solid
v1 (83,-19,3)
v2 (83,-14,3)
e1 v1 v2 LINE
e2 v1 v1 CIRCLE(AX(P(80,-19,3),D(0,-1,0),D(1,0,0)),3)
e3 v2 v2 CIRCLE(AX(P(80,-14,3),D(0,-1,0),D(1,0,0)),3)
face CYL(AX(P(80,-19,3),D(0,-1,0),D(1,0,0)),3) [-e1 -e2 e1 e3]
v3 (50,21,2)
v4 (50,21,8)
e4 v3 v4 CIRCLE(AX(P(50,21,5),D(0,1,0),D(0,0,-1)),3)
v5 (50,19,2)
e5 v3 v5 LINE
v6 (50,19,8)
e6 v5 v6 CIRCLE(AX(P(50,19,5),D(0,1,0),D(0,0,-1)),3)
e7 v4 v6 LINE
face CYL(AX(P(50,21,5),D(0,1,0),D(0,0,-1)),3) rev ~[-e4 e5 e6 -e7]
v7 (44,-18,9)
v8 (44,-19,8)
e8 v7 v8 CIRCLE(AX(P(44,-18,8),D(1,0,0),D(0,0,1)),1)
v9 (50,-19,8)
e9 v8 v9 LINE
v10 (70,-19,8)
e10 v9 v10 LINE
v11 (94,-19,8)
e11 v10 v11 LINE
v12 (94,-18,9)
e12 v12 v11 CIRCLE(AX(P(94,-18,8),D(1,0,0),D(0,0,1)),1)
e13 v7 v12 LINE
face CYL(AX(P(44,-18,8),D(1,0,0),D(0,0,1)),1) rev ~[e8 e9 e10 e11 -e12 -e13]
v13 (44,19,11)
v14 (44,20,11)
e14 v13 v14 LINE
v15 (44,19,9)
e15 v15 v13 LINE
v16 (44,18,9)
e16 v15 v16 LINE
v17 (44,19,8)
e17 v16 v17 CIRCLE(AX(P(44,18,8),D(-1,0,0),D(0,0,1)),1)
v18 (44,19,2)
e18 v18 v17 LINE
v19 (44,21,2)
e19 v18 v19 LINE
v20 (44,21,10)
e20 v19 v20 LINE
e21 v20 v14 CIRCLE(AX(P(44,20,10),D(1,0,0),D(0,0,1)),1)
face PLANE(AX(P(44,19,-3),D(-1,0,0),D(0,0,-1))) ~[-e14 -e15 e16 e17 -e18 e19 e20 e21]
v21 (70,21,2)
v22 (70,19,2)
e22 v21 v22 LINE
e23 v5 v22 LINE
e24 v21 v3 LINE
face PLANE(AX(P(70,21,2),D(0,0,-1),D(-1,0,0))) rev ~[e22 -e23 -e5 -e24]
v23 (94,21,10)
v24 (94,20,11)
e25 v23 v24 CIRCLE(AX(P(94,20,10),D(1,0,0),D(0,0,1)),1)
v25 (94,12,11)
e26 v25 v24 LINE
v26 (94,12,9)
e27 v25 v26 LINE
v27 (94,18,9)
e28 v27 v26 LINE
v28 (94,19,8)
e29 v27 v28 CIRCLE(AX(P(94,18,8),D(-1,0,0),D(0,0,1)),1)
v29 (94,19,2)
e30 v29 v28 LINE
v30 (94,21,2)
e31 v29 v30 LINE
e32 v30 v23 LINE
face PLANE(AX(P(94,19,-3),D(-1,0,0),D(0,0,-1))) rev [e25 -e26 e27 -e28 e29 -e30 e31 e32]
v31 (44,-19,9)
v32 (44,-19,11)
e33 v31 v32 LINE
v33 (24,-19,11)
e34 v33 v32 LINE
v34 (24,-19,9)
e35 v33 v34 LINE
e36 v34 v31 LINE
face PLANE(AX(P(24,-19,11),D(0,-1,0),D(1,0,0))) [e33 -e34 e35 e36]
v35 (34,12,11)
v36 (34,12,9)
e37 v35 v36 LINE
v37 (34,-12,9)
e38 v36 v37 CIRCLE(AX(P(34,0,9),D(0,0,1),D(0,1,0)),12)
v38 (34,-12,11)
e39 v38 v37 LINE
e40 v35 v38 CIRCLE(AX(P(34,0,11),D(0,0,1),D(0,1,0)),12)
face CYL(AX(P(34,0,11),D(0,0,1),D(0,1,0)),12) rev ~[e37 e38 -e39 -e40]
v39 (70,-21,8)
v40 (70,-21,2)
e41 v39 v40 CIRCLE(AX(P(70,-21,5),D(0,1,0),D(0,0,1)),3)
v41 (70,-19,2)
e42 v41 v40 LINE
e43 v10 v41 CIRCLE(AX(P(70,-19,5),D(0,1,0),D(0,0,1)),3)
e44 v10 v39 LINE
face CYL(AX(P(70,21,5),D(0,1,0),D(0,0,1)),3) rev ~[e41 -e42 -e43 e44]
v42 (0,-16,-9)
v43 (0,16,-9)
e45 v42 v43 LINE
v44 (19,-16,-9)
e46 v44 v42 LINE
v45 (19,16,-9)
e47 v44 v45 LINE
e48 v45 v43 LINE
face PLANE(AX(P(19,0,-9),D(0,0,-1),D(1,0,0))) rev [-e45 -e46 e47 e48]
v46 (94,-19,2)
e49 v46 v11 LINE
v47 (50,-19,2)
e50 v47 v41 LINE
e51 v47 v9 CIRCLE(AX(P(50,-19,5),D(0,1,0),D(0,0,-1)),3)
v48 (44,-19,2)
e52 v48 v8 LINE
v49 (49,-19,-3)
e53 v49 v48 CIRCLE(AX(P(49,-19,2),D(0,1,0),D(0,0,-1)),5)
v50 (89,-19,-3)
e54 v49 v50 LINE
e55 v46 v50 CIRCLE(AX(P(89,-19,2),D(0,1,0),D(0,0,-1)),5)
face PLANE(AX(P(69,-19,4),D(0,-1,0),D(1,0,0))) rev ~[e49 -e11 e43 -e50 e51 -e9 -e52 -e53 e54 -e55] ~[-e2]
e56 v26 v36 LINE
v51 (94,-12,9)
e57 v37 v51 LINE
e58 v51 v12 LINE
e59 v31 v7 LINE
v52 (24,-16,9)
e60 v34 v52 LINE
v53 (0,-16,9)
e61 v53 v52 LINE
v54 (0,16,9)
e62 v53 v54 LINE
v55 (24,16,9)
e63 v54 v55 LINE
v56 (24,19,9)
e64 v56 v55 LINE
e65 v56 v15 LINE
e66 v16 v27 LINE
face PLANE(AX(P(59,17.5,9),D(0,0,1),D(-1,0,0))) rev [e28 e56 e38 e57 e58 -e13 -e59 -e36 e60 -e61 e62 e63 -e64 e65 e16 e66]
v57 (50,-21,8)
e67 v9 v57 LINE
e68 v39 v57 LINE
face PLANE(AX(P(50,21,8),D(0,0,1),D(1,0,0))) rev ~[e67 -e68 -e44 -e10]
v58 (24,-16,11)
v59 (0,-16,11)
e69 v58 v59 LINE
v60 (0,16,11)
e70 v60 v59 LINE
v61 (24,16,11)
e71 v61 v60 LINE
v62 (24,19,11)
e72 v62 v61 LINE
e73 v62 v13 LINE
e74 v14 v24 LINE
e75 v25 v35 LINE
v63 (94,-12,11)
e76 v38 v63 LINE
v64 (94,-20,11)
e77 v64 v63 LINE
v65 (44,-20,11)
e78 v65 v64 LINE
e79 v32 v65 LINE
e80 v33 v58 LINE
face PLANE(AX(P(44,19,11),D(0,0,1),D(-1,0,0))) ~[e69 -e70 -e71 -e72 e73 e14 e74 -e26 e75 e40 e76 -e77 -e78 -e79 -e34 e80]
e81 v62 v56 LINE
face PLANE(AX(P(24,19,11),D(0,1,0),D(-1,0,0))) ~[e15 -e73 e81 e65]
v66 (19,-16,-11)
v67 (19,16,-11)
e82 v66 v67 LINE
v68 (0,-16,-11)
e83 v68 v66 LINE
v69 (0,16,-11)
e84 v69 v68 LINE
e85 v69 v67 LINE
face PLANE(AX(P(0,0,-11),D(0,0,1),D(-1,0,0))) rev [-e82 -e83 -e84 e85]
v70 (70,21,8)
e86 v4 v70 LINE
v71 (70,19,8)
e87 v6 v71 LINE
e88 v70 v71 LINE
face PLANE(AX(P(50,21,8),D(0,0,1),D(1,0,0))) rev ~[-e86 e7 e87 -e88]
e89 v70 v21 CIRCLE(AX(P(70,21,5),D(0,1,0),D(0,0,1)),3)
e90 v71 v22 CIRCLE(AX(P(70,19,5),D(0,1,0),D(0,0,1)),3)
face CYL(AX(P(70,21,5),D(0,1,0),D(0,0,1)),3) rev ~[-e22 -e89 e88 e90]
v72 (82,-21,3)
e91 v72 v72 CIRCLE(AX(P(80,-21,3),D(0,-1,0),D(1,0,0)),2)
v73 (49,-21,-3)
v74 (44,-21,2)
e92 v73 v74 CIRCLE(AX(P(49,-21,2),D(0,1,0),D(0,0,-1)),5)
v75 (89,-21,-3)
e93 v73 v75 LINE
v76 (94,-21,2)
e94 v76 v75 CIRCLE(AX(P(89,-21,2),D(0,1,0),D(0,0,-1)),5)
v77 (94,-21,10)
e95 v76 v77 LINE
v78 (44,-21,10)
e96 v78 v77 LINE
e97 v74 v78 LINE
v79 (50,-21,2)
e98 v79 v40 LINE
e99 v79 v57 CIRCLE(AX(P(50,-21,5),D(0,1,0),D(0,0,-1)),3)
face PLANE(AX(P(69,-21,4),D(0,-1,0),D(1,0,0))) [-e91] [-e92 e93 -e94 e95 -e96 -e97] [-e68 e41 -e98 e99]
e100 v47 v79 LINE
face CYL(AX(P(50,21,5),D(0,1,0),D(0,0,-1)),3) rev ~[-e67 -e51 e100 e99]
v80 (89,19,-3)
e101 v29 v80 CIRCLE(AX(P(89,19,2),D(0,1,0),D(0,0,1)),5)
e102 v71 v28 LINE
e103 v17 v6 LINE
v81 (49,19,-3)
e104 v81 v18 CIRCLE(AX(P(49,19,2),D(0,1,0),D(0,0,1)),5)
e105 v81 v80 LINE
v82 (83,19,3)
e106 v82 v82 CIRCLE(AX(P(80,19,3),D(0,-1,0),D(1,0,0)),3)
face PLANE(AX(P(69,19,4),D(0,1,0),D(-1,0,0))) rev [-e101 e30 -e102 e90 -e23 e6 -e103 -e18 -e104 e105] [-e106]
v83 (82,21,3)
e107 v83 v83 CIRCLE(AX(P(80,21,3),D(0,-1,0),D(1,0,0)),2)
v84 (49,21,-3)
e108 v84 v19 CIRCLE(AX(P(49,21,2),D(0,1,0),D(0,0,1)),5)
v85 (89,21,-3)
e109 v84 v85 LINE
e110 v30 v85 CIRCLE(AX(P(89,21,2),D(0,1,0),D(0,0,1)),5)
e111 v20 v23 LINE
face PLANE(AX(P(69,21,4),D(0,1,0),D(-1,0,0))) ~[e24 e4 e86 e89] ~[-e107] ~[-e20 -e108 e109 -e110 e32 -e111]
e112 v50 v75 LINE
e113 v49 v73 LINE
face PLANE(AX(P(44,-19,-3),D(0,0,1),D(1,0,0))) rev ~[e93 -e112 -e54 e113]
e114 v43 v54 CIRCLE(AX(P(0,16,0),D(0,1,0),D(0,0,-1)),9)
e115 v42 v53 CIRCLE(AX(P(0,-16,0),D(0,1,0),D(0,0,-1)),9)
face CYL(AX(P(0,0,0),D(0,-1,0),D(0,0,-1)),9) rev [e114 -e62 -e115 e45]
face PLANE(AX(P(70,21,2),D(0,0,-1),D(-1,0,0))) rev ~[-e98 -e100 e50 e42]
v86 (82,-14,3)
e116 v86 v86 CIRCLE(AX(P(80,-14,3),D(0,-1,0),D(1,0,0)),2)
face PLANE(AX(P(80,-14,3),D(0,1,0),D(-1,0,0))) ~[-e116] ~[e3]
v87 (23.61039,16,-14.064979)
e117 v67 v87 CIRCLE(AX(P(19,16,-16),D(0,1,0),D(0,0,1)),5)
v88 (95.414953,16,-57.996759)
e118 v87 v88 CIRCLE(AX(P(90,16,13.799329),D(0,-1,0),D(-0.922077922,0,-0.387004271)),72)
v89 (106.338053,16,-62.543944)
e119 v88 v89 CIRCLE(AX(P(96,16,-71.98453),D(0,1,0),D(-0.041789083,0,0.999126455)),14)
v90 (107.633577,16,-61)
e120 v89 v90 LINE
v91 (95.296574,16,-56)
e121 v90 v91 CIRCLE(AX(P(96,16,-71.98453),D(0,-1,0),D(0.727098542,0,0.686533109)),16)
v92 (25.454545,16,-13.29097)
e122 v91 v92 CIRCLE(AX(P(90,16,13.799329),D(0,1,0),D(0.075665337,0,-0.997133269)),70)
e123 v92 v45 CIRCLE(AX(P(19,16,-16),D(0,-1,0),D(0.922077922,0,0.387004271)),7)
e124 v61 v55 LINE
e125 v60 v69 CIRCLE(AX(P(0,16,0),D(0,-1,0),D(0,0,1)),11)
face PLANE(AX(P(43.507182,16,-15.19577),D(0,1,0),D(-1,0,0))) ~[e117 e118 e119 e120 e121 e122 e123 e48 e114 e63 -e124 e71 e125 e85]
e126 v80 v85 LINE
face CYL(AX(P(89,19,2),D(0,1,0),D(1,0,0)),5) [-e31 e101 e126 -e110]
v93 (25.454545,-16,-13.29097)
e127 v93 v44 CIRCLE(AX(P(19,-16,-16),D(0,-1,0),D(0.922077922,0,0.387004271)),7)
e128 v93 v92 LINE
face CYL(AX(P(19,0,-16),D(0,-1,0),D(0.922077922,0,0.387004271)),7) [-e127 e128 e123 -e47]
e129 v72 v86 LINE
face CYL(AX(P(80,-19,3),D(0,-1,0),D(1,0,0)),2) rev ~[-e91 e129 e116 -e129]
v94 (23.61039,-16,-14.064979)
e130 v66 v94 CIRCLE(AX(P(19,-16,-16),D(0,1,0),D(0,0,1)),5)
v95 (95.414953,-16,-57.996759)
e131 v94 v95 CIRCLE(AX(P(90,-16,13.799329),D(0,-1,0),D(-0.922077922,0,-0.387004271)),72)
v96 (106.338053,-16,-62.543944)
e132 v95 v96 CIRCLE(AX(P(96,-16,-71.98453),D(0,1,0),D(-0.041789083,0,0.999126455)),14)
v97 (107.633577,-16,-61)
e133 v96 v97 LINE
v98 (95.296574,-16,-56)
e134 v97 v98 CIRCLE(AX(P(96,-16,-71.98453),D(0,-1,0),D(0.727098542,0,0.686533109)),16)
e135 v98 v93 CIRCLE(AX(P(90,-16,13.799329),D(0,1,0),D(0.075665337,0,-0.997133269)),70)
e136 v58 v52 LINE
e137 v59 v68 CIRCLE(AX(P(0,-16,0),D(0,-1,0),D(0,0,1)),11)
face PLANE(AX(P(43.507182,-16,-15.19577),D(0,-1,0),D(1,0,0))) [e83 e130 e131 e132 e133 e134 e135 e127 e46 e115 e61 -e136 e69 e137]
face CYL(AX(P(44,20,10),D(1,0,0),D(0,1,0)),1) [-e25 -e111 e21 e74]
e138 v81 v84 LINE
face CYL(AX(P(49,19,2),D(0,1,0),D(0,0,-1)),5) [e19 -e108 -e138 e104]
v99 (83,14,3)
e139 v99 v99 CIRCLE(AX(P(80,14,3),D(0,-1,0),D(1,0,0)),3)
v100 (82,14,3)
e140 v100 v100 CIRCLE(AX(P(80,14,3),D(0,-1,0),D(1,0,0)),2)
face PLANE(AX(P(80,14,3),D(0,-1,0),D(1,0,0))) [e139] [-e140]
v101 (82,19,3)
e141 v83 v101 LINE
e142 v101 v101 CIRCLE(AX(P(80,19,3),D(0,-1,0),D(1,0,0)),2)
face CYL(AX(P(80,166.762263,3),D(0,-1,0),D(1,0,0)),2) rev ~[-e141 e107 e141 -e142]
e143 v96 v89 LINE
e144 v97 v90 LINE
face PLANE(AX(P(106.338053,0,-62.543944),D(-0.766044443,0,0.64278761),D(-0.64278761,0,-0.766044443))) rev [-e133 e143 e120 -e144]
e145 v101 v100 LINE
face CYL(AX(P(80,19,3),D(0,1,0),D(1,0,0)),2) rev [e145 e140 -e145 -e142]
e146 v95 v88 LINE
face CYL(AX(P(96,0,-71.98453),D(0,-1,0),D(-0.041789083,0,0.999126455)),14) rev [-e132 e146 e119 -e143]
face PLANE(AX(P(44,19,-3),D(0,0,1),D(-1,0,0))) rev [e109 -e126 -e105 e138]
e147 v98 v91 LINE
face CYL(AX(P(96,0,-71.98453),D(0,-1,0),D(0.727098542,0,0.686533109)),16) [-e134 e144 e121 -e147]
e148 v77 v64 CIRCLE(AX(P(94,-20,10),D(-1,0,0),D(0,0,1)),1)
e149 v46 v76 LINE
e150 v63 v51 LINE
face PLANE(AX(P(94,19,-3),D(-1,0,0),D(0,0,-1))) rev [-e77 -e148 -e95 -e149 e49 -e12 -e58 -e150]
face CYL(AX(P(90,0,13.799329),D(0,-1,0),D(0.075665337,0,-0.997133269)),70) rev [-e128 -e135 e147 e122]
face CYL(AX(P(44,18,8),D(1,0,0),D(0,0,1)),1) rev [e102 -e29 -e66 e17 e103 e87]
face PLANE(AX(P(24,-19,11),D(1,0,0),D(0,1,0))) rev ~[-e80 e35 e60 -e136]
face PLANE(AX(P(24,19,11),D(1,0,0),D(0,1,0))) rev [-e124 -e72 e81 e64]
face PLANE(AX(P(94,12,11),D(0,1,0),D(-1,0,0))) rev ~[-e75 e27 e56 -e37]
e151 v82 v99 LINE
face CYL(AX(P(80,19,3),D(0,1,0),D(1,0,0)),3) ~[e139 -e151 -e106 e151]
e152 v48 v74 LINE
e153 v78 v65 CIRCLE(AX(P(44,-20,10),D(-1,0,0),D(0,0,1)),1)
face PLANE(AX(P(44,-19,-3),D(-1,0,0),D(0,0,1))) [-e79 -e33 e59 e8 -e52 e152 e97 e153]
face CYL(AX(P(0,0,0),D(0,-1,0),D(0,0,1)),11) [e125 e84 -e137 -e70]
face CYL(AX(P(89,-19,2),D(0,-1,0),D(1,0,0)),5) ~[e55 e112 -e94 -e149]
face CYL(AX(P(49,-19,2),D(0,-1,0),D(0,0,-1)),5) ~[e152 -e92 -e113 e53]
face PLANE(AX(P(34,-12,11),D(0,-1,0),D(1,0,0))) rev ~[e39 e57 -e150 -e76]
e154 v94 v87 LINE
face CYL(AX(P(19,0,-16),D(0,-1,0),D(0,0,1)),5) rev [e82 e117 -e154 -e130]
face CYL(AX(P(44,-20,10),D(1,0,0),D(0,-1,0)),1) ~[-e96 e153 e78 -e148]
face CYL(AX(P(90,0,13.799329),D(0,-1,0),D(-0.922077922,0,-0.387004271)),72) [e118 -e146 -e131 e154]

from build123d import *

# Parameters (mm, degrees)
F1_DEPTH  = 16
F2_W      = 70
F2_H      = 3
F3_DEPTH  = 2
F4_W      = 50
F4_H      = 14
F5_DEPTH  = 2
F6_R      = 1
F9_DEPTH  = 2
F11_DEPTH = 42.001
F13_D     = 4
F14_R     = 3
F14_R_2   = 2
F15_DEPTH = 5
F17_R     = 5


with BuildPart() as f1:
    # F0 (on Front) → F1 (new body)
    with BuildSketch(Plane.XZ):
        with BuildLine():
            Line((94, 11), (0, 11))
            ThreePointArc((0, 11), (-11, 0), (0, -11))
            Line((0, -11), (19, -11))
            ThreePointArc((19, -11), (21.7681124643, -11.8361612201), (23.6103896104, -14.064978646))
            ThreePointArc((23.6103896104, -14.064978646), (52.4237101957, -47.6174640031), (95.4149528414, -57.9967593826))
            ThreePointArc((95.4149528414, -57.9967593826), (101.3804745105, -59.0597282402), (106.3380534538, -62.5439444501))
            Line((106.3380534538, -62.5439444501), (107.6335766724, -61))
            ThreePointArc((107.6335766724, -61), (102.0097459375, -57.1560789275), (95.2965735981, -56))
            ThreePointArc((95.2965735981, -56), (53.4811996085, -45.9198240056), (25.4545454545, -13.2909701044))
            ThreePointArc((25.4545454545, -13.2909701044), (22.87535745, -10.1706257081), (19, -9))
            Line((19, -9), (0, -9))
            ThreePointArc((0, -9), (-9, 0), (0, 9))
            Line((0, 9), (94, 9))
            Line((94, 9), (94, 11))
        make_face()
    extrude(amount=F1_DEPTH)

    # F2 (on face) → F3 (join)
    with BuildSketch(Plane.XY.offset(11)):
        with Locations((59, -17.5)):
            Rectangle(F2_W, F2_H)
    extrude(amount=-F3_DEPTH)

    # F4 (on face) → F5 (join)
    with BuildSketch(Plane.XZ.offset(19)):
        with Locations((69, 4)):
            Rectangle(F4_W, F4_H)
    extrude(amount=F5_DEPTH)

    # F6
    f6_edges = [f1.edges().sort_by_distance(p)[0] for p in [
        (69, -21, 11),
        (69, -19, 9),
    ]]
    fillet(f6_edges, radius=F6_R)

    # F7: F1 across plane


with BuildPart() as f1_1:
    add(f1.part)
    add(f1.part.mirror(Plane.XZ))

    # F8 (on face) → F9 (cut)
    with BuildSketch(Plane.XY.offset(11)):
        with BuildLine():
            Line((94, 12), (34, 12))
            ThreePointArc((34, 12), (22, 0), (34, -12))
            Line((34, -12), (94, -12))
            Line((94, -12), (94, 12))
        make_face()
    extrude(amount=-F9_DEPTH, mode=Mode.SUBTRACT)

    # F10 (on face) → F11 (cut, through all)
    with BuildSketch(Plane(origin=(0, 21, 0), x_dir=(-1, 0, 0), z_dir=(0, 1, 0))):
        with BuildLine():
            ThreePointArc((-70, 8), (-73, 5), (-70, 2))
            Line((-70, 2), (-50, 2))
            ThreePointArc((-50, 2), (-47, 5), (-50, 8))
            Line((-50, 8), (-70, 8))
        make_face()
    extrude(amount=-F11_DEPTH, mode=Mode.SUBTRACT)

    # F13 (through all)
    with Locations(Plane(origin=(0, 21, 0), x_dir=(-1, 0, 0), z_dir=(0, 1, 0))):
        with Locations((-80, 3)):
            Hole(F13_D / 2)

    # F14 (on face) → F15 (join)
    with BuildSketch(Plane.XZ.offset(-19)):
        with Locations((80, 3)):
            Circle(F14_R)
        with Locations((80, 3)):
            Circle(F14_R_2, mode=Mode.SUBTRACT)
    extrude(amount=F15_DEPTH)

    # F16: F1 across plane


with BuildPart() as f1_2:
    add(f1_1.part)
    add(f1_1.part.mirror(Plane.XZ))

    # F17
    f17_edges = [f1_2.edges().sort_by_distance(p)[0] for p in [
        (94, 20, -3),
        (44, 20, -3),
        (94, -20, -3),
        (44, -20, -3),
    ]]
    fillet(f17_edges, radius=F17_R)


solid = f1_2.part
